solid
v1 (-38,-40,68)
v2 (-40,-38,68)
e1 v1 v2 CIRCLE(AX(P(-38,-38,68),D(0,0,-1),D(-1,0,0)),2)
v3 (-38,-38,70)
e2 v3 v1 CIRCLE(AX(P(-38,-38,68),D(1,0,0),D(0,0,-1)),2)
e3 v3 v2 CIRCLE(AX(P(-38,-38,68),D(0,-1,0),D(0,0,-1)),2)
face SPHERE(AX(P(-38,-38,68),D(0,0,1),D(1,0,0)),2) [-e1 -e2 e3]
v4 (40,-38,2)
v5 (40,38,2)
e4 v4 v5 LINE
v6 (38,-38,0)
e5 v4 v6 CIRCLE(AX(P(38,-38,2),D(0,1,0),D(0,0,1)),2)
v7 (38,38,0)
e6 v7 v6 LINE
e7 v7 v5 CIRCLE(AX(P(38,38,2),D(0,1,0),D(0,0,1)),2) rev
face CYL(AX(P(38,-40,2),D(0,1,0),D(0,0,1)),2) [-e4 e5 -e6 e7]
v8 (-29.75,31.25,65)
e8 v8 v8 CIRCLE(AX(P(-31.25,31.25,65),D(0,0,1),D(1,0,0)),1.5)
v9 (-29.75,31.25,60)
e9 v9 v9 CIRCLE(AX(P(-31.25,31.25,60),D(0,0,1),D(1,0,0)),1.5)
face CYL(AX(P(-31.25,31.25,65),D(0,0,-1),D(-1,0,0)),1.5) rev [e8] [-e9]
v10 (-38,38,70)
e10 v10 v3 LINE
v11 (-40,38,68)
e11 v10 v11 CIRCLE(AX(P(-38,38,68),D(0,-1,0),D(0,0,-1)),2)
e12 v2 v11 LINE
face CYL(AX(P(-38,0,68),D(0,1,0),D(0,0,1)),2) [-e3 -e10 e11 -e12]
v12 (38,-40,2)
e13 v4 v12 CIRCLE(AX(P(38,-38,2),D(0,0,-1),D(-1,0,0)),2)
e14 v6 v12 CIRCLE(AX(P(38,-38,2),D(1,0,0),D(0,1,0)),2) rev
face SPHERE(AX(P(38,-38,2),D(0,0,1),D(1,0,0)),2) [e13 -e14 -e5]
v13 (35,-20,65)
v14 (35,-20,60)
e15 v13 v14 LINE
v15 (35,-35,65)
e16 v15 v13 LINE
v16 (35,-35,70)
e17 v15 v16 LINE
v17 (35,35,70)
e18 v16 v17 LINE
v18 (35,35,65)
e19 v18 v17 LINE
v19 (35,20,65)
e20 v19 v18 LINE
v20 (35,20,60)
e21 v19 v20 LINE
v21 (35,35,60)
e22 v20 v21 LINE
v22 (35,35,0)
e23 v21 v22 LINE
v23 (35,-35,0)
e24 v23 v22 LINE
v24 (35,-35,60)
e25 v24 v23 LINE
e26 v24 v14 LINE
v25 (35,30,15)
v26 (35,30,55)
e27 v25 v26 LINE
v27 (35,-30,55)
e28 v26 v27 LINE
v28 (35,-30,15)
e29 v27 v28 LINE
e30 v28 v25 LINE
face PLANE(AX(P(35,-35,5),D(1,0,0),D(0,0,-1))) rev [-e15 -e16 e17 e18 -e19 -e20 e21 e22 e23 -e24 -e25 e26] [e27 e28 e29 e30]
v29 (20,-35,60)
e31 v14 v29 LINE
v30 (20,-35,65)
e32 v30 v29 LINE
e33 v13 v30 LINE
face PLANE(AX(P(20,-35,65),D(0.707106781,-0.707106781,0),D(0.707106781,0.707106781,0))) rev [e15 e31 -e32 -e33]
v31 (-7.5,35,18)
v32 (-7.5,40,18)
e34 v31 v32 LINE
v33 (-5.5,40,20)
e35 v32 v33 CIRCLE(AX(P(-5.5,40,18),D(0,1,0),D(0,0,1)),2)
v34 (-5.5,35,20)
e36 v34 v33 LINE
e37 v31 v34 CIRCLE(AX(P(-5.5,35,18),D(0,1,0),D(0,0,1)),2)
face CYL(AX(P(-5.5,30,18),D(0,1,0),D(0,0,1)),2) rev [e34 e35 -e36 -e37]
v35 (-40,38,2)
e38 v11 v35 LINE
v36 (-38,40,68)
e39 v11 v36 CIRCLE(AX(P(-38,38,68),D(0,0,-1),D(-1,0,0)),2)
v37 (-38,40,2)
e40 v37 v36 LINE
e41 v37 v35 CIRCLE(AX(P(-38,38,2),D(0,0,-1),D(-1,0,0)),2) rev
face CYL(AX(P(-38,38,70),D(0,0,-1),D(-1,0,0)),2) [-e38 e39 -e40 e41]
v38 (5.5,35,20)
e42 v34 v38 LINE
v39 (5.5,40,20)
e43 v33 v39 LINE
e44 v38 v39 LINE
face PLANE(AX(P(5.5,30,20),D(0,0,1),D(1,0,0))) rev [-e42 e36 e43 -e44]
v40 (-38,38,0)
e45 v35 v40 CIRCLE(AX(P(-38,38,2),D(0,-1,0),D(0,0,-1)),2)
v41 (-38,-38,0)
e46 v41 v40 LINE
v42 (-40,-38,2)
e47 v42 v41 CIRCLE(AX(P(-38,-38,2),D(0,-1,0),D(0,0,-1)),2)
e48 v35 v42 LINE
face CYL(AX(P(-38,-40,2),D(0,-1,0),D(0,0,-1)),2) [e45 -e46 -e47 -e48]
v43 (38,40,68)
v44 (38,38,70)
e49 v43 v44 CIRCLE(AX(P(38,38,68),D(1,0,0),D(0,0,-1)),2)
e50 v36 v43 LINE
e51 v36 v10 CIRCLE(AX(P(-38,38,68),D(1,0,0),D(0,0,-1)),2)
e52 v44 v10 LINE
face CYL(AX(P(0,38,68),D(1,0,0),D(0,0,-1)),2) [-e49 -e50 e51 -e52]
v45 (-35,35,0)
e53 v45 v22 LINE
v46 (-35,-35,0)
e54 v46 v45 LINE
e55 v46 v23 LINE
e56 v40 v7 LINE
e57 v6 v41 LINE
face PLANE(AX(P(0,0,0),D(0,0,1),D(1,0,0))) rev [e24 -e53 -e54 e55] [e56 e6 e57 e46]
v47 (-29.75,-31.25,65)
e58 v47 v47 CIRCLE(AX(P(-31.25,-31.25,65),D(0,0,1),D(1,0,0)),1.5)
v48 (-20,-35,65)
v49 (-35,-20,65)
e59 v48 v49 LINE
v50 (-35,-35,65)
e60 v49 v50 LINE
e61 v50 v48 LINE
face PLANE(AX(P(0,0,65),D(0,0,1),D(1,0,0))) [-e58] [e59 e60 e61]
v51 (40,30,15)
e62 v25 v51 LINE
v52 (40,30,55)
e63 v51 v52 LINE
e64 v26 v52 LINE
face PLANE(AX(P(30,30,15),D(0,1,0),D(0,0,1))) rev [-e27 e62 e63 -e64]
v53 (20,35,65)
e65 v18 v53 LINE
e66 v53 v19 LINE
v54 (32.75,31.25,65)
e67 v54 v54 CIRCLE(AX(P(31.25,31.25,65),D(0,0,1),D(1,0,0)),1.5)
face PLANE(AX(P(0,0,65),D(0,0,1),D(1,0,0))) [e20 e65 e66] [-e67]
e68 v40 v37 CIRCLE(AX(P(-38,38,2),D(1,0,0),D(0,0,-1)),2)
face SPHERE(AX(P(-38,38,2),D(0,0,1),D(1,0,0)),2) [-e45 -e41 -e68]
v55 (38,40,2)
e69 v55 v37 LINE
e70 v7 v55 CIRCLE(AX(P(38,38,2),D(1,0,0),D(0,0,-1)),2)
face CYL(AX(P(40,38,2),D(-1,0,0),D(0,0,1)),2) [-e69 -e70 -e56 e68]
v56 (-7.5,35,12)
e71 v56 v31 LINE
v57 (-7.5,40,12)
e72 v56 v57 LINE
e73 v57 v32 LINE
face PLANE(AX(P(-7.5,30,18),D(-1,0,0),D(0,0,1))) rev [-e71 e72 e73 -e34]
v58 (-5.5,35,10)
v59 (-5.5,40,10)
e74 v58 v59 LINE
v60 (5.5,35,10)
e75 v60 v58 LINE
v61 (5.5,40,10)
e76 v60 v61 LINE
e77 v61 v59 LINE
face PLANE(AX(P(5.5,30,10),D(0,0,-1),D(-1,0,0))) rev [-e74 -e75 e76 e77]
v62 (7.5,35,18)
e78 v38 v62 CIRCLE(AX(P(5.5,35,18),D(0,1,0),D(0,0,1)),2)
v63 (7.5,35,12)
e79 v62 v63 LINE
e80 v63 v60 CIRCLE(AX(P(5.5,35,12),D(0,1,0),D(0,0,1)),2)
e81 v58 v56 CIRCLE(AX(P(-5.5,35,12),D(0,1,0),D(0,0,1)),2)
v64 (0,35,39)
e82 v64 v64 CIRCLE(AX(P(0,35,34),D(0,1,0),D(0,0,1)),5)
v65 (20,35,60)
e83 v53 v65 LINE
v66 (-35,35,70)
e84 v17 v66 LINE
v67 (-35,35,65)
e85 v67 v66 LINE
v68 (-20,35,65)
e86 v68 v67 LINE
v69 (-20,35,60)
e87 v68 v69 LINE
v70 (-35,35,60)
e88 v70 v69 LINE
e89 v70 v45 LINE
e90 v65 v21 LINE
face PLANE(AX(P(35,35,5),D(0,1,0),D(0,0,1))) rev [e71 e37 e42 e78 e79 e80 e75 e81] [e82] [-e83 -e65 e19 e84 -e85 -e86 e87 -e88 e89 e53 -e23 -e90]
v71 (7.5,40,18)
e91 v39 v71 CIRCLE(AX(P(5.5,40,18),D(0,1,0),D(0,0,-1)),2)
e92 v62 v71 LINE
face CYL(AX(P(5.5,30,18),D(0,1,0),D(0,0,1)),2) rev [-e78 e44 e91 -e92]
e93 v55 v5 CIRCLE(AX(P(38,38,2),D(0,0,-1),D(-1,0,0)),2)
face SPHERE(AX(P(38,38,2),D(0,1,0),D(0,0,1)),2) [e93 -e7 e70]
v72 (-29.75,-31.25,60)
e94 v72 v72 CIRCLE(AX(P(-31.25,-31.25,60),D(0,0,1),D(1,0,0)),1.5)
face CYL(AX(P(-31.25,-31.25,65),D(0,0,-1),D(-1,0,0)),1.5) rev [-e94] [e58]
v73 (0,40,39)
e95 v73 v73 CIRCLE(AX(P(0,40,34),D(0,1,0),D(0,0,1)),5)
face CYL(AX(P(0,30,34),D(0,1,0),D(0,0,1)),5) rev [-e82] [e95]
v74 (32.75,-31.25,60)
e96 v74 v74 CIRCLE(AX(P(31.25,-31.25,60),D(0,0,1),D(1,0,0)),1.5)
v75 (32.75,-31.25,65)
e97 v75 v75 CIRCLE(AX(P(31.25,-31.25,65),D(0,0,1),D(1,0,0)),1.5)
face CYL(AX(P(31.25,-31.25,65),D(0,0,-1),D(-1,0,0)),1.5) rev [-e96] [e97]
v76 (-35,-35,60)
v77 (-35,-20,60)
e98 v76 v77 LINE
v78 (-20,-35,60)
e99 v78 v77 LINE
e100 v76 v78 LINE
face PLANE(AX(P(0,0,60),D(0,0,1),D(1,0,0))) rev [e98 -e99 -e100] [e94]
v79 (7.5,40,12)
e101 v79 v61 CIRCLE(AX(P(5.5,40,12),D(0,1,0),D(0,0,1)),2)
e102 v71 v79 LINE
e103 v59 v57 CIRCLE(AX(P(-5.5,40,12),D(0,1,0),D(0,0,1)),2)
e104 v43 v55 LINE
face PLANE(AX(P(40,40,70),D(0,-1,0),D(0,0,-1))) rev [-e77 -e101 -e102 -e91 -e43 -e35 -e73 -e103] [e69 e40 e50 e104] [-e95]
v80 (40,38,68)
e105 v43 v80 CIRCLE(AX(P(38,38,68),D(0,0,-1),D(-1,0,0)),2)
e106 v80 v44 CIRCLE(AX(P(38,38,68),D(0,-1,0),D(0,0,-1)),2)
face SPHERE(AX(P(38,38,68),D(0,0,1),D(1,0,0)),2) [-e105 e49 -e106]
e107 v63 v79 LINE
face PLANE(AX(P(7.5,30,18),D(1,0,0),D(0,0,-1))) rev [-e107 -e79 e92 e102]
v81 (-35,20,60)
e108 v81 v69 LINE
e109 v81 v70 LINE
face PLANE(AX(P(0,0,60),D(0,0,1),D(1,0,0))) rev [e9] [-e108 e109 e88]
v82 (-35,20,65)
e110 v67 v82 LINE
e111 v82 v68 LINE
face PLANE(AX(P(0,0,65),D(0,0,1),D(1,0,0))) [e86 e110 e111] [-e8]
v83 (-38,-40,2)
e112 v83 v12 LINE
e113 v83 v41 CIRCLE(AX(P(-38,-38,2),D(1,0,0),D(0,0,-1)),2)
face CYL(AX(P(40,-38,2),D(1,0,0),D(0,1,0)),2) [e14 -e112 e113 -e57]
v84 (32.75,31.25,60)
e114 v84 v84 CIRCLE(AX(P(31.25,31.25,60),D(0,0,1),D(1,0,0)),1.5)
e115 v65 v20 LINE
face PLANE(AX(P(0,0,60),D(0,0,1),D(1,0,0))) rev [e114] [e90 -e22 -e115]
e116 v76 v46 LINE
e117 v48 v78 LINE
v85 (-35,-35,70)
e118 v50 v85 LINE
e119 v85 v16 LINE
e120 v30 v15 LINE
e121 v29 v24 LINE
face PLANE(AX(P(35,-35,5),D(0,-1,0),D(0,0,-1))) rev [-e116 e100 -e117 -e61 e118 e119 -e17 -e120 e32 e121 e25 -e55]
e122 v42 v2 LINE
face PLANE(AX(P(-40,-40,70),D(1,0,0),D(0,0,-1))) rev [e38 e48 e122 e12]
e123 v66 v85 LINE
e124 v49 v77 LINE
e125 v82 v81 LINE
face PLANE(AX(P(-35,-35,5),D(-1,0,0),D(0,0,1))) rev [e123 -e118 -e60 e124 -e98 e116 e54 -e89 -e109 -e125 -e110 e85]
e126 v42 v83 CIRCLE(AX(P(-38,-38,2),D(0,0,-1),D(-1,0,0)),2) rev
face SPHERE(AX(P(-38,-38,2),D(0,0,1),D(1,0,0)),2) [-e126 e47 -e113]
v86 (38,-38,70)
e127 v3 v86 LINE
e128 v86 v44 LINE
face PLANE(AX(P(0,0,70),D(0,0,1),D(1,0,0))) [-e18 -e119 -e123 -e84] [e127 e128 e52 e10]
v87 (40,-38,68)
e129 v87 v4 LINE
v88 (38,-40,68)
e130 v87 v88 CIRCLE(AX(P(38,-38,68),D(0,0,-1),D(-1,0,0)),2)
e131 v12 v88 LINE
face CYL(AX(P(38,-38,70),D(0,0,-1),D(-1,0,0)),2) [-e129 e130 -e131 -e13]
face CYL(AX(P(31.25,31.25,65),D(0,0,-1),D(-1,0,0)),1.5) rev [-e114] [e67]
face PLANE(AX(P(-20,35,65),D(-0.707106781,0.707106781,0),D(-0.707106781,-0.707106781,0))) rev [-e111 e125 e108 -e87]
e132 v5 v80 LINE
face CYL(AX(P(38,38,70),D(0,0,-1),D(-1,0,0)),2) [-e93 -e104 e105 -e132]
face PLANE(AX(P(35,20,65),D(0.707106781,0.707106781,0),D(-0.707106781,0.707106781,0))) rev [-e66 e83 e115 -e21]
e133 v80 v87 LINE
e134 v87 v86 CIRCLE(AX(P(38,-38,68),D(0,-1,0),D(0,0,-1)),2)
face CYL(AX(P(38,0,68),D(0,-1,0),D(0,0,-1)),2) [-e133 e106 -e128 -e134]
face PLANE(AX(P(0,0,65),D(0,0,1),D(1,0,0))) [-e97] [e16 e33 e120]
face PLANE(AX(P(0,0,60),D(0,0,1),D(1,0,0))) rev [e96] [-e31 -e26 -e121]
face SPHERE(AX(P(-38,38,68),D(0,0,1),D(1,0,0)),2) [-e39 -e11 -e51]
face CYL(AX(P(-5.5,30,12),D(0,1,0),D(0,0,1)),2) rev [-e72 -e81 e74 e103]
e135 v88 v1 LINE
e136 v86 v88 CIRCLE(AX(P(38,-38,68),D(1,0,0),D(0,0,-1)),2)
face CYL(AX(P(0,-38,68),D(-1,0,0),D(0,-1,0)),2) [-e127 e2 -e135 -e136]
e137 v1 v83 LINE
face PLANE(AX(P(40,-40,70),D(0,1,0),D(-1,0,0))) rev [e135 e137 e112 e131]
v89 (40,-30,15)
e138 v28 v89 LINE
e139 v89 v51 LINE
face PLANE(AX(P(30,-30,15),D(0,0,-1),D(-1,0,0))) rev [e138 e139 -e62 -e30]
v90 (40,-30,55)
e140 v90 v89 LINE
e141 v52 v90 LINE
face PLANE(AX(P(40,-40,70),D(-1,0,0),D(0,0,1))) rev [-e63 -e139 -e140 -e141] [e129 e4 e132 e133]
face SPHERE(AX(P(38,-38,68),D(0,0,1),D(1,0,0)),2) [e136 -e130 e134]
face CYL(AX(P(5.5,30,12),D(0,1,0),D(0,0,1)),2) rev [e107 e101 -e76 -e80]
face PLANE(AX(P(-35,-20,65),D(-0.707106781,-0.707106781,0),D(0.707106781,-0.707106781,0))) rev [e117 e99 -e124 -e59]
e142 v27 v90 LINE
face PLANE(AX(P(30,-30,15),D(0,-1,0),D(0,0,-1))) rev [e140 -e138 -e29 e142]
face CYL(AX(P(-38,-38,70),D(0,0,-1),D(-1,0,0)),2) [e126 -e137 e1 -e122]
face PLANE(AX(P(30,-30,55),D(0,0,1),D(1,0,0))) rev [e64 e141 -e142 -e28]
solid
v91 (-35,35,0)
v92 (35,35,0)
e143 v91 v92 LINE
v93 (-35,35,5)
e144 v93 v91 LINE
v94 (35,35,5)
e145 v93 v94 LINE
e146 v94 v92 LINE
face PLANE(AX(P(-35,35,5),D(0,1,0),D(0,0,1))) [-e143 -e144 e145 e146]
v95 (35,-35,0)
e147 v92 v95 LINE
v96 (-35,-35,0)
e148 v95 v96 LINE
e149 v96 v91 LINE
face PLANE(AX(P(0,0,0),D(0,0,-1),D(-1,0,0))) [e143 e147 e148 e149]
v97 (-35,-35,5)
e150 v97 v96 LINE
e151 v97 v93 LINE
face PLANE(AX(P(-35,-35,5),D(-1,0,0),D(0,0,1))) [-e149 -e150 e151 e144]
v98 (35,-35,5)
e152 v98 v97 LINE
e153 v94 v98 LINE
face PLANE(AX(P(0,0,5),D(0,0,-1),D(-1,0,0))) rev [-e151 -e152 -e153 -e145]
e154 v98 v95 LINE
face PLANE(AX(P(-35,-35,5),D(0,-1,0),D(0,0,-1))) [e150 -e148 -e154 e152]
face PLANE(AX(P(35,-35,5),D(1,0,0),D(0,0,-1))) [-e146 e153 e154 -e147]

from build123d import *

# Parameters (mm, degrees)
SKETCH_1_W          = 80
SKETCH_1_H          = 80
EXTRUDE_1_DEPTH     = 70
SKETCH_2_W          = 70
SKETCH_2_H          = 70
CUT_EXTRUDE_1_DEPTH = 65
FILLET_1_R          = 2
FILLET_2_R          = 2
FILLET_3_R          = 2
CUT_EXTRUDE_3_DEPTH = 10
SKETCH_4_W          = 10
SKETCH_4_H          = 30
CUT_EXTRUDE_4_DEPTH = 10
SKETCH_5_R          = 5
CUT_EXTRUDE_5_DEPTH = 10
FILLET_4_R          = 2
SKETCH_6_W          = 40
SKETCH_6_H          = 60
CUT_EXTRUDE_6_DEPTH = 10
SKETCH_7_R          = 1.5
EXTRUDE_2_DEPTH     = 60
SKETCH_8_W          = 70
SKETCH_8_H          = 70
CUT_EXTRUDE_7_DEPTH = 60
SKETCH_9_W          = 70
SKETCH_9_H          = 70
EXTRUDE_3_DEPTH     = 5


with BuildPart() as part:
    # Эскиз1 → Бобышка-Вытянуть1 (new body)
    with BuildSketch(Plane.XY):
        Rectangle(SKETCH_1_W, SKETCH_1_H)
    extrude(amount=EXTRUDE_1_DEPTH)

    # Эскиз2 → Вырез-Вытянуть1 (cut)
    with BuildSketch(Plane.XY.offset(70)):
        Rectangle(SKETCH_2_W, SKETCH_2_H)
    extrude(amount=-CUT_EXTRUDE_1_DEPTH, mode=Mode.SUBTRACT)

    # Скругление1
    fillet_1_edges = [part.edges().sort_by_distance(p)[0] for p in [
        (-40, 40, 35),
        (-40, -40, 35),
    ]]
    fillet(fillet_1_edges, radius=FILLET_1_R)

    # Скругление2
    fillet_2_edges = [part.edges().sort_by_distance(p)[0] for p in [
        (1, -40, 0),
        (-40, 0, 0),
        (-39.414213562, 39.414213562, 0),
        (-39.414213562, -39.414213562, 0),
        (1, 40, 0),
        (40, 0, 0),
        (40, 40, 35),
    ]]
    fillet(fillet_2_edges, radius=FILLET_2_R)

    # Скругление3
    # the kernel refuses this fillet: 2 mm, written as the material it takes off along each edge
    with BuildSketch(Plane(origin=(38, -38, 2), x_dir=(1, 0, 0), z_dir=(0, -1, 0))) as fillet_3_piece_1_section:
        Polygon((0, 0), (FILLET_3_R, 0), (FILLET_3_R, -FILLET_3_R), (0, -FILLET_3_R), align=None)
    fillet_3_piece_1 = extrude(amount=FILLET_3_R, mode=Mode.PRIVATE)
    fillet_3_piece_1 = fillet_3_piece_1 - Plane(origin=(38, -38, 2), x_dir=(-0.7071067811865475, 0, 0.7071067811865475), z_dir=(0, -1, 0)) * Sphere(FILLET_3_R, mode=Mode.PRIVATE)
    add(fillet_3_piece_1, mode=Mode.SUBTRACT)
    with BuildSketch(Plane(origin=(40, -40, 2), x_dir=(-1, 0, 0), z_dir=(0, 0, 1))) as fillet_3_piece_2:
        with BuildLine():
            CenterArc((FILLET_3_R, -FILLET_3_R), FILLET_3_R, 90, 90)
            Line((0, -FILLET_3_R), (0, 0))
            Line((0, 0), (FILLET_3_R, 0))
        make_face()
    extrude(amount=73, mode=Mode.SUBTRACT)

    # Эскиз3 → Вырез-Вытянуть3 (cut)
    with BuildSketch(Plane(origin=(0, 40, 0), x_dir=(1, 0, 0), z_dir=(0, 1, 0))):
        with BuildLine():
            Line((5.5, -20), (-5.5, -20))
            ThreePointArc((-5.5, -20), (-6.914213562, -19.414213562), (-7.5, -18))
            Line((-7.5, -18), (-7.5, -12))
            ThreePointArc((-7.5, -12), (-6.914213562, -10.585786438), (-5.5, -10))
            Line((-5.5, -10), (5.5, -10))
            ThreePointArc((5.5, -10), (6.914213562, -10.585786438), (7.5, -12))
            Line((7.5, -12), (7.5, -18))
            ThreePointArc((7.5, -18), (6.914213562, -19.414213562), (5.5, -20))
        make_face()
    extrude(amount=-CUT_EXTRUDE_3_DEPTH, mode=Mode.SUBTRACT)

    # Эскиз4 → Вырез-Вытянуть4 (cut)
    with BuildSketch(Plane(origin=(40, 0, 0), x_dir=(0, 0, -1), z_dir=(1, 0, 0))):
        with Locations((-36, 0)):
            Rectangle(SKETCH_4_W, SKETCH_4_H)
    extrude(amount=-CUT_EXTRUDE_4_DEPTH, mode=Mode.SUBTRACT)

    # Эскиз5 → Вырез-Вытянуть5 (cut)
    with BuildSketch(Plane(origin=(0, 40, 0), x_dir=(1, 0, 0), z_dir=(0, 1, 0))):
        with Locations(Location((0, -34, 0), (0, 0, 270))):
            Circle(SKETCH_5_R)
    extrude(amount=-CUT_EXTRUDE_5_DEPTH, mode=Mode.SUBTRACT)

    # Скругление4
    fillet_4_edges = [part.edges().sort_by_distance(p)[0] for p in [
        (0, -40, 70),
        (-40, 0, 70),
        (-39.414213562, 39.414213562, 70),
        (-39.414213562, -39.414213562, 70),
        (0, 40, 70),
        (39.414213562, 39.414213562, 70),
        (40, 0, 70),
        (39.414213562, -39.414213562, 70),
    ]]
    fillet(fillet_4_edges, radius=FILLET_4_R)

    # Эскиз6 → Вырез-Вытянуть6 (cut)
    with BuildSketch(Plane(origin=(40, 0, 0), x_dir=(0, 0, -1), z_dir=(1, 0, 0))):
        with Locations((-35, 0)):
            Rectangle(SKETCH_6_W, SKETCH_6_H)
    extrude(amount=-CUT_EXTRUDE_6_DEPTH, mode=Mode.SUBTRACT)

    # Эскиз7 → Бобышка-Вытянуть2 (add)
    # profile 1 of 4: a face of its own
    with BuildSketch(Plane.XY.offset(5)):
        Polygon((-20, 35), (-35, 20), (-35, 35), align=None)
        with Locations((-31.25, 31.25)):
            Circle(SKETCH_7_R, mode=Mode.SUBTRACT)
    # profile 2 of 4: a face of its own
    with BuildSketch(Plane.XY.offset(5)):
        Polygon((35, 20), (20, 35), (35, 35), align=None)
        with Locations((31.25, 31.25)):
            Circle(SKETCH_7_R, mode=Mode.SUBTRACT)
    # profile 3 of 4: a face of its own
    with BuildSketch(Plane.XY.offset(5)):
        Polygon((20, -35), (35, -20), (35, -35), align=None)
        with Locations((31.25, -31.25)):
            Circle(SKETCH_7_R, mode=Mode.SUBTRACT)
    # profile 4 of 4: a face of its own
    with BuildSketch(Plane.XY.offset(5)):
        Polygon((-35, -20), (-20, -35), (-35, -35), align=None)
        with Locations((-31.25, -31.25)):
            Circle(SKETCH_7_R, mode=Mode.SUBTRACT)
    extrude(amount=EXTRUDE_2_DEPTH)

    # Эскиз8 → Вырез-Вытянуть7 (cut)
    with BuildSketch(Plane(origin=(0, 0, 0), x_dir=(-1, 0, 0), z_dir=(0, 0, -1))):
        Rectangle(SKETCH_8_W, SKETCH_8_H)
    extrude(amount=-CUT_EXTRUDE_7_DEPTH, mode=Mode.SUBTRACT)


with BuildPart() as body_2:
    # Эскиз9 → Бобышка-Вытянуть3 (new body)
    with BuildSketch(Plane(origin=(0, 0, 0), x_dir=(-1, 0, 0), z_dir=(0, 0, -1))):
        Rectangle(SKETCH_9_W, SKETCH_9_H)
    extrude(amount=-EXTRUDE_3_DEPTH)


solid = Compound([part.part, body_2.part])
